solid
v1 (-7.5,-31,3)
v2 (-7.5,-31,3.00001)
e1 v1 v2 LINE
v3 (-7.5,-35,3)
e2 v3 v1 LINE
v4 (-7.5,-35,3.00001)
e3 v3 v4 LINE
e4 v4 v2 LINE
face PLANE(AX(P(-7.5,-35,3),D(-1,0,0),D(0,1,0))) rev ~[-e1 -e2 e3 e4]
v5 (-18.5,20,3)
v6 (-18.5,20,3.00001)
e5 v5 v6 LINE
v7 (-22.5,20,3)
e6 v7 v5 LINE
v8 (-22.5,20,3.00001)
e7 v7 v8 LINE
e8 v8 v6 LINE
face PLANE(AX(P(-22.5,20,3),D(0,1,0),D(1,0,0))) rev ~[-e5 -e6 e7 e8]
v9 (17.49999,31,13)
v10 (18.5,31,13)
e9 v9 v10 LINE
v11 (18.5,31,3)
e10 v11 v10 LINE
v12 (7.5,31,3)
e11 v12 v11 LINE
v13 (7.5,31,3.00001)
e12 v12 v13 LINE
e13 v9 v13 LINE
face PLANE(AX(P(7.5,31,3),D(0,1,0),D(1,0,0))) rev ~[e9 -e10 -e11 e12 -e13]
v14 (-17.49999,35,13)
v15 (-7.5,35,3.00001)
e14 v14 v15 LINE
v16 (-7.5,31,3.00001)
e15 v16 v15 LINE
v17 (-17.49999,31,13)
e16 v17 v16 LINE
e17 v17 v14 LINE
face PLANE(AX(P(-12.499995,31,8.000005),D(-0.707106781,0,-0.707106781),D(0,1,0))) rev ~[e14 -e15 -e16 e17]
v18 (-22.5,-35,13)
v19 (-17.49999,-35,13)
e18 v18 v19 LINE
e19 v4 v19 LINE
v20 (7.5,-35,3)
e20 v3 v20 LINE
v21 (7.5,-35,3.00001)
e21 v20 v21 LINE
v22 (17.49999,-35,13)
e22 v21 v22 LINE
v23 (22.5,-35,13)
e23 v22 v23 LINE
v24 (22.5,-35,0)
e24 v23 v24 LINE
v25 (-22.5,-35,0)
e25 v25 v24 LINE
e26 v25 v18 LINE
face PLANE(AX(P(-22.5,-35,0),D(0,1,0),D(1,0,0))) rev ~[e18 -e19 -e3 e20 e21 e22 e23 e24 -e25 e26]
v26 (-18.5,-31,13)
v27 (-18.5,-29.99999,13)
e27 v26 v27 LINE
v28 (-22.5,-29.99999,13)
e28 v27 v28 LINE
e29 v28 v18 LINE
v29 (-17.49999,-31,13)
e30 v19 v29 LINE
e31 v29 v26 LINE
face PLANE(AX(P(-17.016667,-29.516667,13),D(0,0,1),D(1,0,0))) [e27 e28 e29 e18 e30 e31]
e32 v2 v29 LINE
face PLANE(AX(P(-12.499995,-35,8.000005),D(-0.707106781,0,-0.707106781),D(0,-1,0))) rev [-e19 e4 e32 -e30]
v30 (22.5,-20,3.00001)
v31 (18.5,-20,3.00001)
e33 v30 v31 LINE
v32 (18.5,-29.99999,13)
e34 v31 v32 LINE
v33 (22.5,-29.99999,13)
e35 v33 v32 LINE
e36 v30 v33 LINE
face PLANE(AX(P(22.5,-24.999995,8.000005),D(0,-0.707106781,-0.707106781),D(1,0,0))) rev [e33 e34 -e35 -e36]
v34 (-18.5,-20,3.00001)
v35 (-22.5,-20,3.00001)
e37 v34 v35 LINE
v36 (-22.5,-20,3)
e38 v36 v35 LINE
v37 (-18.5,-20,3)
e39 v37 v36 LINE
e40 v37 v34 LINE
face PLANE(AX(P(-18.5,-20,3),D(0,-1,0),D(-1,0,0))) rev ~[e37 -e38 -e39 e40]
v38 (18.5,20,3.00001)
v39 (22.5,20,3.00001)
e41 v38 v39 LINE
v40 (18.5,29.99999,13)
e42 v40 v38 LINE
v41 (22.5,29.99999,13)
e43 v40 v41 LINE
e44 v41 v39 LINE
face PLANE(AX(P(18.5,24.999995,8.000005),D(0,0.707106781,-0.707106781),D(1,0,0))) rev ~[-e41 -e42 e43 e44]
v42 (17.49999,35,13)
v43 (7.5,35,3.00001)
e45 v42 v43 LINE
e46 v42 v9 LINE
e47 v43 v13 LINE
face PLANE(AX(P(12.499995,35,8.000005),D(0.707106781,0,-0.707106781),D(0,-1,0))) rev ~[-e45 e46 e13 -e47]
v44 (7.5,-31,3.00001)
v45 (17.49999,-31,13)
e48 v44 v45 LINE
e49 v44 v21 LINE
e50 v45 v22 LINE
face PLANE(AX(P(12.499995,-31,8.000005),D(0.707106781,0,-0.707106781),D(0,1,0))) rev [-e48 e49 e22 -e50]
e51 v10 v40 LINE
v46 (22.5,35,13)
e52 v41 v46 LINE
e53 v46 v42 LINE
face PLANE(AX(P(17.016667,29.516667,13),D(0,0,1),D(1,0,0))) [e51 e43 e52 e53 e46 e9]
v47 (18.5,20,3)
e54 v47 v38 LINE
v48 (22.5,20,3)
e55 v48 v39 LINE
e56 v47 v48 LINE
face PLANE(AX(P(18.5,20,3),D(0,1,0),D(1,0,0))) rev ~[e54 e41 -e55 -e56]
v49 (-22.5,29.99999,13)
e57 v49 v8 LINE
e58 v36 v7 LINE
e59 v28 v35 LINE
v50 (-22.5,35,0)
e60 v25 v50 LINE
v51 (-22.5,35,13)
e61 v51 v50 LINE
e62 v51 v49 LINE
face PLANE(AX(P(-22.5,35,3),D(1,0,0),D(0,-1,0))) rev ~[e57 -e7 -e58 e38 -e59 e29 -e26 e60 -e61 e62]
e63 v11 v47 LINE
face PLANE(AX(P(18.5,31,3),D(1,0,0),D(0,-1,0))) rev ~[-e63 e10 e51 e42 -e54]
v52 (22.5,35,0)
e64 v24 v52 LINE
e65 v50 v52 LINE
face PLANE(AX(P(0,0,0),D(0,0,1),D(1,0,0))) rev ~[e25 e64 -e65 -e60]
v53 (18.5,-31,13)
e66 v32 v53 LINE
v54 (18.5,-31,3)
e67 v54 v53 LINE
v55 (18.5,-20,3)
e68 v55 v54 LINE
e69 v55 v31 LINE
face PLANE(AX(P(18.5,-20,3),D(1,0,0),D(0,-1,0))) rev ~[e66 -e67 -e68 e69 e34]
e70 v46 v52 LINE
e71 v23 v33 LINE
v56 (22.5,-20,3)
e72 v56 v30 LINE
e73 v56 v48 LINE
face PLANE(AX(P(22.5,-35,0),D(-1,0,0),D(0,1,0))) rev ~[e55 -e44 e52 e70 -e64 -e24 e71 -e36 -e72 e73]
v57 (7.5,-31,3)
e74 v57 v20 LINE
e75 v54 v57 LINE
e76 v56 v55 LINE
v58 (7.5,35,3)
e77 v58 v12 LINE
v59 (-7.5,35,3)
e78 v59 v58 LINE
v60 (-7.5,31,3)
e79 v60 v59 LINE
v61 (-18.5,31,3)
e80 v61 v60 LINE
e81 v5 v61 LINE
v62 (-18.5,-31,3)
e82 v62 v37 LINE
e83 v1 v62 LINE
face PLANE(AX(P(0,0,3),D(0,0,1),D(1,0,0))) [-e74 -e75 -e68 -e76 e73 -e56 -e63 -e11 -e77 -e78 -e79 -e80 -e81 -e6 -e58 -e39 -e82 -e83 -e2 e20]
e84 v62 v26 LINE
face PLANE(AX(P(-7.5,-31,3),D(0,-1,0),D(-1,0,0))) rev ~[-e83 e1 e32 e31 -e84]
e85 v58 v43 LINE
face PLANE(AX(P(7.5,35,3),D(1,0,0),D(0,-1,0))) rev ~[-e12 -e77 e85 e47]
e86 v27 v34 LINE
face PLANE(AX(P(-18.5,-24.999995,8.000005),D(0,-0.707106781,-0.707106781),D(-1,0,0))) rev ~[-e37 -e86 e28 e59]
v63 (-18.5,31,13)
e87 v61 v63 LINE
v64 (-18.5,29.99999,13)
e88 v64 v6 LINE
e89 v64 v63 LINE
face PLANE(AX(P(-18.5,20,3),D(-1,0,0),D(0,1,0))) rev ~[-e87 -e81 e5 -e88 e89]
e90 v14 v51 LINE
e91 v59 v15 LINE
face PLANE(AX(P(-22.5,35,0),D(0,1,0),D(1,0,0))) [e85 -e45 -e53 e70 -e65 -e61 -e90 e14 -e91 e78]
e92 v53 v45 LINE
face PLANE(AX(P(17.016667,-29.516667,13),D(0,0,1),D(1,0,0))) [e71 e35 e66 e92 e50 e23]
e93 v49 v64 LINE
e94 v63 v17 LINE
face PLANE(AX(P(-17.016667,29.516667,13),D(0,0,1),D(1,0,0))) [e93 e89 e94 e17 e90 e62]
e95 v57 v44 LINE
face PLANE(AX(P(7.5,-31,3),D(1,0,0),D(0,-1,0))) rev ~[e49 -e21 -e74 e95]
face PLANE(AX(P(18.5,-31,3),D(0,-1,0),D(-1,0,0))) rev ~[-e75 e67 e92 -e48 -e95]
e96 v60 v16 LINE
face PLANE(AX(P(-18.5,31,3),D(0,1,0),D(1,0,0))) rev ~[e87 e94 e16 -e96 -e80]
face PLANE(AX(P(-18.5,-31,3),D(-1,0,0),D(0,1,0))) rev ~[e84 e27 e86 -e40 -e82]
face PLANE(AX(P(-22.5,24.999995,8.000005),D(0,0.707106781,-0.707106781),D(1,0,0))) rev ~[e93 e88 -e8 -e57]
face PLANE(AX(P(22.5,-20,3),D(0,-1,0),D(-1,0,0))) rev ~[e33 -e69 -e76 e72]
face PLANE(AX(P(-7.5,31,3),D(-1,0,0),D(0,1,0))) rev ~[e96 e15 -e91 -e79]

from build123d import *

# Parameters (mm, degrees)
F0_W     = 45
F0_H     = 70
F1_DEPTH = 3
F3_DEPTH = 10
F4_SIZE  = 9.99999


# Not quite as in the source:
# - a fillet or chamfer is up to 0.001 mm smaller than in the source, because OpenCascade refuses the exact size


with BuildPart() as f1:
    # F0 (on Top) → F1 (new body)
    with BuildSketch(Plane.XY):
        Rectangle(F0_W, F0_H)
    extrude(amount=F1_DEPTH)

    # F2 (on face) → F3 (join)
    with BuildSketch(Plane.XY.offset(3)):
        Polygon((-18.5, 20), (-18.5, 31), (-7.5, 31), (-7.5, 35), (-22.5, 35), (-22.5, 20), align=None)
        Polygon((7.5, 35), (7.5, 31), (18.5, 31), (18.5, 20), (22.5, 20), (22.5, 35), align=None)
        Polygon((18.5, -31), (7.5, -31), (7.5, -35), (22.5, -35), (22.5, -20), (18.5, -20), align=None)
        Polygon((-18.5, -31), (-18.5, -20), (-22.5, -20), (-22.5, -35), (-7.5, -35), (-7.5, -31), align=None)
    extrude(amount=F3_DEPTH)

    # F4 (size 10 in the source; OpenCascade refuses exactly that, so slightly less here)
    f4_edges = [f1.edges().sort_by_distance(p)[0] for p in [
        (-7.5, 33, 13),
        (-7.5, -33, 13),
        (-20.5, -20, 13),
        (20.5, -20, 13),
        (20.5, 20, 13),
        (-20.5, 20, 13),
        (7.5, -33, 13),
        (7.5, 33, 13),
    ]]
    chamfer(f4_edges, length=F4_SIZE)


solid = f1.part
